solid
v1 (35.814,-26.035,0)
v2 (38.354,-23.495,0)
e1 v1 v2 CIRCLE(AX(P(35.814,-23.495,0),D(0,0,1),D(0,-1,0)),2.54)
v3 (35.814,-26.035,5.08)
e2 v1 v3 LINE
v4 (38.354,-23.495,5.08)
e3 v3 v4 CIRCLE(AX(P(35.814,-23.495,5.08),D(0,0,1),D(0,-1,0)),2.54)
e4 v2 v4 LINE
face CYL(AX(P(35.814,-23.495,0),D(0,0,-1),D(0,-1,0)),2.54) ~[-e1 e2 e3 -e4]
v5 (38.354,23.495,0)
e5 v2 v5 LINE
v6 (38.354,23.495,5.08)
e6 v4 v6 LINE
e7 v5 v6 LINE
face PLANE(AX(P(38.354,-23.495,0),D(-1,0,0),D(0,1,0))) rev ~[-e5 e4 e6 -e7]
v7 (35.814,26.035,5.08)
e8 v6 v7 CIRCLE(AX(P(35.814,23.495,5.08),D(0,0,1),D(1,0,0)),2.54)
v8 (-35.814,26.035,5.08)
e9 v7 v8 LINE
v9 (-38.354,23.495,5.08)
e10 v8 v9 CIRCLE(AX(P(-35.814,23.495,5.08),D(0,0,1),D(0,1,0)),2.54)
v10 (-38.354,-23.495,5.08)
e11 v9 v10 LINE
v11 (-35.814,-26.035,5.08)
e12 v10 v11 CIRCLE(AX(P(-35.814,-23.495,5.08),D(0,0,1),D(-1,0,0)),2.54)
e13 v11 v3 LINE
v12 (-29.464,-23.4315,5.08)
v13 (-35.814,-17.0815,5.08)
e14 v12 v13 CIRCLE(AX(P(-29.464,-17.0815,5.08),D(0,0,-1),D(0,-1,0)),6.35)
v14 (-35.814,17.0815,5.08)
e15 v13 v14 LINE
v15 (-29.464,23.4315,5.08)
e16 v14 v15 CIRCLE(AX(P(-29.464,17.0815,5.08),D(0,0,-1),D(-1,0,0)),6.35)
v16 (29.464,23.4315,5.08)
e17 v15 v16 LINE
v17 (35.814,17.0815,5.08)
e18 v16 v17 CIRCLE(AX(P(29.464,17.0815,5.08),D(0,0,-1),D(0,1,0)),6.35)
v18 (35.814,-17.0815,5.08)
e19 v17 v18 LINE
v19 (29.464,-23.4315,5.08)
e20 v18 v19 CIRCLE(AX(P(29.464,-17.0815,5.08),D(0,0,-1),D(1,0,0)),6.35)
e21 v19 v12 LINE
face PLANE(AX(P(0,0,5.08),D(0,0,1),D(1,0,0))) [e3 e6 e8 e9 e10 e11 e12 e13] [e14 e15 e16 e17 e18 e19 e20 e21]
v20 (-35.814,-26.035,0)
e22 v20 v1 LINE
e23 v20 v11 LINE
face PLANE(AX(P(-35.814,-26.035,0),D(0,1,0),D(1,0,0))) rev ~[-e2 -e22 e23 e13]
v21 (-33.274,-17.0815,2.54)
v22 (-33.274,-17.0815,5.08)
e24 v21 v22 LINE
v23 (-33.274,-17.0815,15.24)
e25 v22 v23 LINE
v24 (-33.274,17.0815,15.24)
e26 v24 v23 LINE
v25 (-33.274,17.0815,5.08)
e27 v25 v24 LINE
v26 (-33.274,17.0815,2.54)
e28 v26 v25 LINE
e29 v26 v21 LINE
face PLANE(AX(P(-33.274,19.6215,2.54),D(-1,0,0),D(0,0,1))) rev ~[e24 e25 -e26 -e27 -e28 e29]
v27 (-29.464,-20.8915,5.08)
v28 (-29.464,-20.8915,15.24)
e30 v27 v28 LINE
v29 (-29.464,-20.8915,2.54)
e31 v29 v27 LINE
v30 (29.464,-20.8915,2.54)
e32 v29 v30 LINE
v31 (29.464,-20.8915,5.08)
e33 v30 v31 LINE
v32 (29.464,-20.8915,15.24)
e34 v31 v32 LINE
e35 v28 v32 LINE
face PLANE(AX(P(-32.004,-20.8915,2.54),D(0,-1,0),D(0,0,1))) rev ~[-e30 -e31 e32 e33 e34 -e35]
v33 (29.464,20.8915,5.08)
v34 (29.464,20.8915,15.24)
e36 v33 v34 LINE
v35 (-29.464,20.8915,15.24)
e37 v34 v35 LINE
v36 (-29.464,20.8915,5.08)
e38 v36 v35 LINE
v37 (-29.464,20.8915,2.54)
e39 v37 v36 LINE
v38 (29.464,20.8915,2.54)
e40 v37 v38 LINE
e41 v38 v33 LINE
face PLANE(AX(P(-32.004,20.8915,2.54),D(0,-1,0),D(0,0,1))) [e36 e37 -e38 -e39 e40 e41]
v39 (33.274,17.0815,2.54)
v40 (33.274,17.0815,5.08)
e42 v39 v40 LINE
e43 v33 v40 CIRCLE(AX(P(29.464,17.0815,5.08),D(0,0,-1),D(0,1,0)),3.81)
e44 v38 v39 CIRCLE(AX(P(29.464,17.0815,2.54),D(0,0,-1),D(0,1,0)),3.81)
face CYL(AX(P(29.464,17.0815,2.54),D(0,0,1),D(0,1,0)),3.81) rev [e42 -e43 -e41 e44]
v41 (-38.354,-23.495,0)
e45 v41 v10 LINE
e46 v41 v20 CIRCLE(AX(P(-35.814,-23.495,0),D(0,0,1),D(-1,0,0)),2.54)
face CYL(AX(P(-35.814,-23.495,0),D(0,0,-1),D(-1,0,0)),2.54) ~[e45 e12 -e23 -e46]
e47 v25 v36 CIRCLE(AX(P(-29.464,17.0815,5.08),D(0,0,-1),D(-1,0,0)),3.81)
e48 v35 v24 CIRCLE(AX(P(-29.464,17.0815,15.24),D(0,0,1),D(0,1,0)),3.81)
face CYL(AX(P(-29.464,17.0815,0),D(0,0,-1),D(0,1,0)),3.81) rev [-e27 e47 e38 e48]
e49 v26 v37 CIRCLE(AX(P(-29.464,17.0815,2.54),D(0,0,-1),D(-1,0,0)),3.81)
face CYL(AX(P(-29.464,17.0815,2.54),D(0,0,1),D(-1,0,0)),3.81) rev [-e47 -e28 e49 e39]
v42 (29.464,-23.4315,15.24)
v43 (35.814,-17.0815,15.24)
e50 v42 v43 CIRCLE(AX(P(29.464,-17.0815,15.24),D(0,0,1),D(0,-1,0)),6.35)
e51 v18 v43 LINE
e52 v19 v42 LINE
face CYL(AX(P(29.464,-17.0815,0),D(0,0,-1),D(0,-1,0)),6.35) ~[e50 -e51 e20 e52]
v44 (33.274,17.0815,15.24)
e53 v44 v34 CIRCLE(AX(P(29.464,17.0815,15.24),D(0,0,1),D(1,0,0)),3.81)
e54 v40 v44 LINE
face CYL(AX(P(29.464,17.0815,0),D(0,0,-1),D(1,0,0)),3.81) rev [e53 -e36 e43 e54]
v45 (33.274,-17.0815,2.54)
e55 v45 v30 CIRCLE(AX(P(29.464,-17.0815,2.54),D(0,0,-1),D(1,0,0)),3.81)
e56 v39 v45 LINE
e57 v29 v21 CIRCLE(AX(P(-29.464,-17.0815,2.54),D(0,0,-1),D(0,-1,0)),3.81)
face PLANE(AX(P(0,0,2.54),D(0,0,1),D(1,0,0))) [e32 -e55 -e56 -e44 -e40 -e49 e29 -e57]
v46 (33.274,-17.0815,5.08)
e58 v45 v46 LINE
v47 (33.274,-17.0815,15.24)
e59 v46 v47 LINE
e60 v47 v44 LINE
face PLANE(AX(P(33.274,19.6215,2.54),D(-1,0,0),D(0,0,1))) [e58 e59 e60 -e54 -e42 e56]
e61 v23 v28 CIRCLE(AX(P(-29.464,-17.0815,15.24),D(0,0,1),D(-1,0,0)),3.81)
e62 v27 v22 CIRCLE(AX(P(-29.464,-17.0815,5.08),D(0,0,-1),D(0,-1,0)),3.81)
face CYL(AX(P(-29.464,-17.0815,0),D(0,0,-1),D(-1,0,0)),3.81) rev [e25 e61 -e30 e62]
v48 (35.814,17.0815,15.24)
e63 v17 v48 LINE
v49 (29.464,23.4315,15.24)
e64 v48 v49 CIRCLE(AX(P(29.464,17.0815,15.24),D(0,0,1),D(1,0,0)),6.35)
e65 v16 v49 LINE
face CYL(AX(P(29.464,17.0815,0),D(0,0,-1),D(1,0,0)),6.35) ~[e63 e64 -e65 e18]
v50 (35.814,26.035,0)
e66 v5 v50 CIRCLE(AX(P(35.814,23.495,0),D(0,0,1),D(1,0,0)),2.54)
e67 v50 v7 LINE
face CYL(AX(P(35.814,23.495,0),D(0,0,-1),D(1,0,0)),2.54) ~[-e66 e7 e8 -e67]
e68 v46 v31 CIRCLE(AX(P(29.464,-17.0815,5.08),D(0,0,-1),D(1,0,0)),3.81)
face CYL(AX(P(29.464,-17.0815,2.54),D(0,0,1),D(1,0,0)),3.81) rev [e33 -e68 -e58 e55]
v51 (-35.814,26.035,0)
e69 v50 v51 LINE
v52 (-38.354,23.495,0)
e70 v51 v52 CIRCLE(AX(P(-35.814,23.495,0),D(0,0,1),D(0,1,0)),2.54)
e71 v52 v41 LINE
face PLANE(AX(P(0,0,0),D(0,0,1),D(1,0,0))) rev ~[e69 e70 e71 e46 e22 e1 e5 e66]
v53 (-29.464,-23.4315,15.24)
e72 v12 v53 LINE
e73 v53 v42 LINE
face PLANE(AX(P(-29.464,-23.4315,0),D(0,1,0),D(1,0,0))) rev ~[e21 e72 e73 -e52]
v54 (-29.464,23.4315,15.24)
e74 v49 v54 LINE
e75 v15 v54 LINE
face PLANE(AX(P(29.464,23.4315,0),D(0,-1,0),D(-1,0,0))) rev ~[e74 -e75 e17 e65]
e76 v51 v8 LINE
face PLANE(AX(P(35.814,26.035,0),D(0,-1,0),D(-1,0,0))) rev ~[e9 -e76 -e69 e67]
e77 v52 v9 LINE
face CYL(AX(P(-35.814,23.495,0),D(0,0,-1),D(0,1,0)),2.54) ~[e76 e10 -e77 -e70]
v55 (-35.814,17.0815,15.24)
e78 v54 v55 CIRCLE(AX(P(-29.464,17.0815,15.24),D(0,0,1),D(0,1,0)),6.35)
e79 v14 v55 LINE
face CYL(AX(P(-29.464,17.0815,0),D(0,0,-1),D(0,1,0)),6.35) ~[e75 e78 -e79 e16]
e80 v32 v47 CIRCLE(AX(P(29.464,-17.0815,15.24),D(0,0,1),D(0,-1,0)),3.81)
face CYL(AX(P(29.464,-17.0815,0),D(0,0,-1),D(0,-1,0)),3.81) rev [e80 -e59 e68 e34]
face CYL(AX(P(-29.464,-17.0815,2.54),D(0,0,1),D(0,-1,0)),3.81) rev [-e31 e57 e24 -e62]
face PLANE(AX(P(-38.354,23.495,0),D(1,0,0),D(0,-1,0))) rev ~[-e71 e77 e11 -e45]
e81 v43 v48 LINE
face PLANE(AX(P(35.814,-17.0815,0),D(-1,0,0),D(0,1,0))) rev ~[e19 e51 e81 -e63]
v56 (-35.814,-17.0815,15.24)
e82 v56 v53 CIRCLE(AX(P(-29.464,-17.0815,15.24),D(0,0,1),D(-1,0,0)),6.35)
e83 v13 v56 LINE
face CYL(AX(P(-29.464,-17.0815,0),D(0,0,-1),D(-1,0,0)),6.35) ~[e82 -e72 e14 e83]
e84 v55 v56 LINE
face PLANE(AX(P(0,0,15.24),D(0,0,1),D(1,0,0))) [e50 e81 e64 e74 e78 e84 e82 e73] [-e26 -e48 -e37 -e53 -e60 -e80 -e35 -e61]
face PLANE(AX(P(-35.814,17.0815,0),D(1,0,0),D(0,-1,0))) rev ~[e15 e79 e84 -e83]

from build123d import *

# Parameters (mm, degrees)
F1_DEPTH     = 5.08
F3_DEPTH     = 15.24
F4_T         = 2.54
F4_T3_DEPTH  = 64.008
F4_T5_DEPTH  = 39.243
F4_T8_ANGLE  = 90.000000001
F4_T10_ANGLE = 90.000000001
F4_T12_ANGLE = 90.000000001
F4_T14_ANGLE = 90.000000001


# Not quite as in the source:
# - a shell that OpenCascade refuses in one call is made with other operations: the cavity is built on its own and cut out
# - the program builds the solid bodies; features that only make, move or delete a surface that nothing else refers to are left out


with BuildPart() as f1:
    # F0 (on Top) → F1 (new body)
    with BuildSketch(Plane.XY):
        with BuildLine():
            Line((35.814, 26.035), (-35.814, 26.035))
            ThreePointArc((-35.814, 26.035), (-37.6100512242, 25.2910512242), (-38.354, 23.495))
            Line((-38.354, 23.495), (-38.354, -23.495))
            ThreePointArc((-38.354, -23.495), (-37.6100512242, -25.2910512242), (-35.814, -26.035))
            Line((-35.814, -26.035), (35.814, -26.035))
            ThreePointArc((35.814, -26.035), (37.6100512242, -25.2910512242), (38.354, -23.495))
            Line((38.354, -23.495), (38.354, 23.495))
            ThreePointArc((38.354, 23.495), (37.6100512242, 25.2910512242), (35.814, 26.035))
        make_face()
        with BuildLine():
            ThreePointArc((-35.814, 17.0815), (-33.9541280605, 21.5716280605), (-29.464, 23.4315))
            Line((-29.464, 23.4315), (29.464, 23.4315))
            ThreePointArc((29.464, 23.4315), (33.9541280605, 21.5716280605), (35.814, 17.0815))
            Line((35.814, 17.0815), (35.814, -17.0815))
            ThreePointArc((35.814, -17.0815), (33.9541280605, -21.5716280605), (29.464, -23.4315))
            Line((29.464, -23.4315), (-29.464, -23.4315))
            ThreePointArc((-29.464, -23.4315), (-33.9541280605, -21.5716280605), (-35.814, -17.0815))
            Line((-35.814, -17.0815), (-35.814, 17.0815))
        make_face(mode=Mode.SUBTRACT)
    extrude(amount=F1_DEPTH)

    # F0 (on Top) → F3 (join)
    with BuildSketch(Plane.XY):
        with BuildLine():
            Line((29.464, 23.4315), (-29.464, 23.4315))
            ThreePointArc((-29.464, 23.4315), (-33.9541280605, 21.5716280605), (-35.814, 17.0815))
            Line((-35.814, 17.0815), (-35.814, -17.0815))
            ThreePointArc((-35.814, -17.0815), (-33.9541280605, -21.5716280605), (-29.464, -23.4315))
            Line((-29.464, -23.4315), (29.464, -23.4315))
            ThreePointArc((29.464, -23.4315), (33.9541280605, -21.5716280605), (35.814, -17.0815))
            Line((35.814, -17.0815), (35.814, 17.0815))
            ThreePointArc((35.814, 17.0815), (33.9541280605, 21.5716280605), (29.464, 23.4315))
        make_face()
    extrude(amount=F3_DEPTH)

    # F4: shell of thickness 2.54, made by hand


with BuildPart() as f4_core1:
    # F4_t2: copy of F1
    add(f1.part)

    # the walls: a layer under each face that stays
    f4_faces = [f4_core1.faces().sort_by_distance(p)[0] for p in [
        (0, 26.035, 2.54),
        (0, 0, 0),
        (-35.7970666667, -24.2993333333, 5.08),
        (38.354, 0, 2.54),
        (-38.354, 0, 2.54),
        (0, -26.035, 2.54),
        (-33.9541280605, 21.5716280605, 10.16),
        (0, 23.4315, 10.16),
        (33.9541280605, 21.5716280605, 10.16),
        (35.814, 0, 10.16),
        (33.9541280605, -21.5716280605, 10.16),
        (0, -23.4315, 10.16),
        (-33.9541280605, -21.5716280605, 10.16),
        (-35.814, 0, 10.16),
    ]]
    thicken(f4_faces, amount=-F4_T, mode=Mode.SUBTRACT)

    # F4_s4 → F4_t3 (cut)
    with BuildSketch(Plane.YZ.offset(-32.004)):
        Polygon((23.4569, 5.1054), (23.4315, 2.54), (20.8915, 2.54), (20.8915, 5.08), align=None)
        Polygon((-23.4569, 5.1054), (-23.4315, 2.54), (-20.8915, 2.54), (-20.8915, 5.08), align=None)
    extrude(amount=F4_T3_DEPTH, mode=Mode.SUBTRACT)

    # F4_s6 → F4_t5 (cut)
    with BuildSketch(Plane.XZ.offset(-19.6215)):
        Polygon((35.8394, 5.1054), (35.814, 2.54), (33.274, 2.54), (33.274, 5.08), align=None)
        Polygon((-35.8394, 5.1054), (-35.814, 2.54), (-33.274, 2.54), (-33.274, 5.08), align=None)
    extrude(amount=F4_T5_DEPTH, mode=Mode.SUBTRACT)

    # F4_s7 → F4_t8 (revolve, cut)
    with BuildSketch(Plane.XZ.offset(-17.0815)):
        Polygon((-35.8394, 5.1054), (-35.814, 2.54), (-33.274, 2.54), (-33.274, 5.08), align=None)
    revolve(axis=Axis((-29.464, 17.0815, 5.08), (0, 0, -1)), revolution_arc=F4_T8_ANGLE, mode=Mode.SUBTRACT)

    # F4_s9 → F4_t10 (revolve, cut)
    with BuildSketch(Plane.YZ.offset(29.464)):
        Polygon((23.4569, 5.1054), (23.4315, 2.54), (20.8915, 2.54), (20.8915, 5.08), align=None)
    revolve(axis=Axis((29.464, 17.0815, 5.08), (0, 0, -1)), revolution_arc=F4_T10_ANGLE, mode=Mode.SUBTRACT)

    # F4_s11 → F4_t12 (revolve, cut)
    with BuildSketch(Plane.XZ.offset(17.0815)):
        Polygon((35.8394, 5.1054), (35.814, 2.54), (33.274, 2.54), (33.274, 5.08), align=None)
    revolve(axis=Axis((29.464, -17.0815, 5.08), (0, 0, -1)), revolution_arc=F4_T12_ANGLE, mode=Mode.SUBTRACT)

    # F4_s13 → F4_t14 (revolve, cut)
    with BuildSketch(Plane.YZ.offset(-29.464)):
        Polygon((-23.4569, 5.1054), (-23.4315, 2.54), (-20.8915, 2.54), (-20.8915, 5.08), align=None)
    revolve(axis=Axis((-29.464, -17.0815, 5.08), (0, 0, -1)), revolution_arc=F4_T14_ANGLE, mode=Mode.SUBTRACT)


with BuildPart() as f1_1:
    add(f1.part)

    # what is left inside the walls is the cavity
    f4_cavity = [f4_core1.part.solids().sort_by_distance(p)[0] for p in [
        (0, -6.963833, 2.5654),
    ]]
    add(f4_cavity, mode=Mode.SUBTRACT)


solid = f1_1.part
